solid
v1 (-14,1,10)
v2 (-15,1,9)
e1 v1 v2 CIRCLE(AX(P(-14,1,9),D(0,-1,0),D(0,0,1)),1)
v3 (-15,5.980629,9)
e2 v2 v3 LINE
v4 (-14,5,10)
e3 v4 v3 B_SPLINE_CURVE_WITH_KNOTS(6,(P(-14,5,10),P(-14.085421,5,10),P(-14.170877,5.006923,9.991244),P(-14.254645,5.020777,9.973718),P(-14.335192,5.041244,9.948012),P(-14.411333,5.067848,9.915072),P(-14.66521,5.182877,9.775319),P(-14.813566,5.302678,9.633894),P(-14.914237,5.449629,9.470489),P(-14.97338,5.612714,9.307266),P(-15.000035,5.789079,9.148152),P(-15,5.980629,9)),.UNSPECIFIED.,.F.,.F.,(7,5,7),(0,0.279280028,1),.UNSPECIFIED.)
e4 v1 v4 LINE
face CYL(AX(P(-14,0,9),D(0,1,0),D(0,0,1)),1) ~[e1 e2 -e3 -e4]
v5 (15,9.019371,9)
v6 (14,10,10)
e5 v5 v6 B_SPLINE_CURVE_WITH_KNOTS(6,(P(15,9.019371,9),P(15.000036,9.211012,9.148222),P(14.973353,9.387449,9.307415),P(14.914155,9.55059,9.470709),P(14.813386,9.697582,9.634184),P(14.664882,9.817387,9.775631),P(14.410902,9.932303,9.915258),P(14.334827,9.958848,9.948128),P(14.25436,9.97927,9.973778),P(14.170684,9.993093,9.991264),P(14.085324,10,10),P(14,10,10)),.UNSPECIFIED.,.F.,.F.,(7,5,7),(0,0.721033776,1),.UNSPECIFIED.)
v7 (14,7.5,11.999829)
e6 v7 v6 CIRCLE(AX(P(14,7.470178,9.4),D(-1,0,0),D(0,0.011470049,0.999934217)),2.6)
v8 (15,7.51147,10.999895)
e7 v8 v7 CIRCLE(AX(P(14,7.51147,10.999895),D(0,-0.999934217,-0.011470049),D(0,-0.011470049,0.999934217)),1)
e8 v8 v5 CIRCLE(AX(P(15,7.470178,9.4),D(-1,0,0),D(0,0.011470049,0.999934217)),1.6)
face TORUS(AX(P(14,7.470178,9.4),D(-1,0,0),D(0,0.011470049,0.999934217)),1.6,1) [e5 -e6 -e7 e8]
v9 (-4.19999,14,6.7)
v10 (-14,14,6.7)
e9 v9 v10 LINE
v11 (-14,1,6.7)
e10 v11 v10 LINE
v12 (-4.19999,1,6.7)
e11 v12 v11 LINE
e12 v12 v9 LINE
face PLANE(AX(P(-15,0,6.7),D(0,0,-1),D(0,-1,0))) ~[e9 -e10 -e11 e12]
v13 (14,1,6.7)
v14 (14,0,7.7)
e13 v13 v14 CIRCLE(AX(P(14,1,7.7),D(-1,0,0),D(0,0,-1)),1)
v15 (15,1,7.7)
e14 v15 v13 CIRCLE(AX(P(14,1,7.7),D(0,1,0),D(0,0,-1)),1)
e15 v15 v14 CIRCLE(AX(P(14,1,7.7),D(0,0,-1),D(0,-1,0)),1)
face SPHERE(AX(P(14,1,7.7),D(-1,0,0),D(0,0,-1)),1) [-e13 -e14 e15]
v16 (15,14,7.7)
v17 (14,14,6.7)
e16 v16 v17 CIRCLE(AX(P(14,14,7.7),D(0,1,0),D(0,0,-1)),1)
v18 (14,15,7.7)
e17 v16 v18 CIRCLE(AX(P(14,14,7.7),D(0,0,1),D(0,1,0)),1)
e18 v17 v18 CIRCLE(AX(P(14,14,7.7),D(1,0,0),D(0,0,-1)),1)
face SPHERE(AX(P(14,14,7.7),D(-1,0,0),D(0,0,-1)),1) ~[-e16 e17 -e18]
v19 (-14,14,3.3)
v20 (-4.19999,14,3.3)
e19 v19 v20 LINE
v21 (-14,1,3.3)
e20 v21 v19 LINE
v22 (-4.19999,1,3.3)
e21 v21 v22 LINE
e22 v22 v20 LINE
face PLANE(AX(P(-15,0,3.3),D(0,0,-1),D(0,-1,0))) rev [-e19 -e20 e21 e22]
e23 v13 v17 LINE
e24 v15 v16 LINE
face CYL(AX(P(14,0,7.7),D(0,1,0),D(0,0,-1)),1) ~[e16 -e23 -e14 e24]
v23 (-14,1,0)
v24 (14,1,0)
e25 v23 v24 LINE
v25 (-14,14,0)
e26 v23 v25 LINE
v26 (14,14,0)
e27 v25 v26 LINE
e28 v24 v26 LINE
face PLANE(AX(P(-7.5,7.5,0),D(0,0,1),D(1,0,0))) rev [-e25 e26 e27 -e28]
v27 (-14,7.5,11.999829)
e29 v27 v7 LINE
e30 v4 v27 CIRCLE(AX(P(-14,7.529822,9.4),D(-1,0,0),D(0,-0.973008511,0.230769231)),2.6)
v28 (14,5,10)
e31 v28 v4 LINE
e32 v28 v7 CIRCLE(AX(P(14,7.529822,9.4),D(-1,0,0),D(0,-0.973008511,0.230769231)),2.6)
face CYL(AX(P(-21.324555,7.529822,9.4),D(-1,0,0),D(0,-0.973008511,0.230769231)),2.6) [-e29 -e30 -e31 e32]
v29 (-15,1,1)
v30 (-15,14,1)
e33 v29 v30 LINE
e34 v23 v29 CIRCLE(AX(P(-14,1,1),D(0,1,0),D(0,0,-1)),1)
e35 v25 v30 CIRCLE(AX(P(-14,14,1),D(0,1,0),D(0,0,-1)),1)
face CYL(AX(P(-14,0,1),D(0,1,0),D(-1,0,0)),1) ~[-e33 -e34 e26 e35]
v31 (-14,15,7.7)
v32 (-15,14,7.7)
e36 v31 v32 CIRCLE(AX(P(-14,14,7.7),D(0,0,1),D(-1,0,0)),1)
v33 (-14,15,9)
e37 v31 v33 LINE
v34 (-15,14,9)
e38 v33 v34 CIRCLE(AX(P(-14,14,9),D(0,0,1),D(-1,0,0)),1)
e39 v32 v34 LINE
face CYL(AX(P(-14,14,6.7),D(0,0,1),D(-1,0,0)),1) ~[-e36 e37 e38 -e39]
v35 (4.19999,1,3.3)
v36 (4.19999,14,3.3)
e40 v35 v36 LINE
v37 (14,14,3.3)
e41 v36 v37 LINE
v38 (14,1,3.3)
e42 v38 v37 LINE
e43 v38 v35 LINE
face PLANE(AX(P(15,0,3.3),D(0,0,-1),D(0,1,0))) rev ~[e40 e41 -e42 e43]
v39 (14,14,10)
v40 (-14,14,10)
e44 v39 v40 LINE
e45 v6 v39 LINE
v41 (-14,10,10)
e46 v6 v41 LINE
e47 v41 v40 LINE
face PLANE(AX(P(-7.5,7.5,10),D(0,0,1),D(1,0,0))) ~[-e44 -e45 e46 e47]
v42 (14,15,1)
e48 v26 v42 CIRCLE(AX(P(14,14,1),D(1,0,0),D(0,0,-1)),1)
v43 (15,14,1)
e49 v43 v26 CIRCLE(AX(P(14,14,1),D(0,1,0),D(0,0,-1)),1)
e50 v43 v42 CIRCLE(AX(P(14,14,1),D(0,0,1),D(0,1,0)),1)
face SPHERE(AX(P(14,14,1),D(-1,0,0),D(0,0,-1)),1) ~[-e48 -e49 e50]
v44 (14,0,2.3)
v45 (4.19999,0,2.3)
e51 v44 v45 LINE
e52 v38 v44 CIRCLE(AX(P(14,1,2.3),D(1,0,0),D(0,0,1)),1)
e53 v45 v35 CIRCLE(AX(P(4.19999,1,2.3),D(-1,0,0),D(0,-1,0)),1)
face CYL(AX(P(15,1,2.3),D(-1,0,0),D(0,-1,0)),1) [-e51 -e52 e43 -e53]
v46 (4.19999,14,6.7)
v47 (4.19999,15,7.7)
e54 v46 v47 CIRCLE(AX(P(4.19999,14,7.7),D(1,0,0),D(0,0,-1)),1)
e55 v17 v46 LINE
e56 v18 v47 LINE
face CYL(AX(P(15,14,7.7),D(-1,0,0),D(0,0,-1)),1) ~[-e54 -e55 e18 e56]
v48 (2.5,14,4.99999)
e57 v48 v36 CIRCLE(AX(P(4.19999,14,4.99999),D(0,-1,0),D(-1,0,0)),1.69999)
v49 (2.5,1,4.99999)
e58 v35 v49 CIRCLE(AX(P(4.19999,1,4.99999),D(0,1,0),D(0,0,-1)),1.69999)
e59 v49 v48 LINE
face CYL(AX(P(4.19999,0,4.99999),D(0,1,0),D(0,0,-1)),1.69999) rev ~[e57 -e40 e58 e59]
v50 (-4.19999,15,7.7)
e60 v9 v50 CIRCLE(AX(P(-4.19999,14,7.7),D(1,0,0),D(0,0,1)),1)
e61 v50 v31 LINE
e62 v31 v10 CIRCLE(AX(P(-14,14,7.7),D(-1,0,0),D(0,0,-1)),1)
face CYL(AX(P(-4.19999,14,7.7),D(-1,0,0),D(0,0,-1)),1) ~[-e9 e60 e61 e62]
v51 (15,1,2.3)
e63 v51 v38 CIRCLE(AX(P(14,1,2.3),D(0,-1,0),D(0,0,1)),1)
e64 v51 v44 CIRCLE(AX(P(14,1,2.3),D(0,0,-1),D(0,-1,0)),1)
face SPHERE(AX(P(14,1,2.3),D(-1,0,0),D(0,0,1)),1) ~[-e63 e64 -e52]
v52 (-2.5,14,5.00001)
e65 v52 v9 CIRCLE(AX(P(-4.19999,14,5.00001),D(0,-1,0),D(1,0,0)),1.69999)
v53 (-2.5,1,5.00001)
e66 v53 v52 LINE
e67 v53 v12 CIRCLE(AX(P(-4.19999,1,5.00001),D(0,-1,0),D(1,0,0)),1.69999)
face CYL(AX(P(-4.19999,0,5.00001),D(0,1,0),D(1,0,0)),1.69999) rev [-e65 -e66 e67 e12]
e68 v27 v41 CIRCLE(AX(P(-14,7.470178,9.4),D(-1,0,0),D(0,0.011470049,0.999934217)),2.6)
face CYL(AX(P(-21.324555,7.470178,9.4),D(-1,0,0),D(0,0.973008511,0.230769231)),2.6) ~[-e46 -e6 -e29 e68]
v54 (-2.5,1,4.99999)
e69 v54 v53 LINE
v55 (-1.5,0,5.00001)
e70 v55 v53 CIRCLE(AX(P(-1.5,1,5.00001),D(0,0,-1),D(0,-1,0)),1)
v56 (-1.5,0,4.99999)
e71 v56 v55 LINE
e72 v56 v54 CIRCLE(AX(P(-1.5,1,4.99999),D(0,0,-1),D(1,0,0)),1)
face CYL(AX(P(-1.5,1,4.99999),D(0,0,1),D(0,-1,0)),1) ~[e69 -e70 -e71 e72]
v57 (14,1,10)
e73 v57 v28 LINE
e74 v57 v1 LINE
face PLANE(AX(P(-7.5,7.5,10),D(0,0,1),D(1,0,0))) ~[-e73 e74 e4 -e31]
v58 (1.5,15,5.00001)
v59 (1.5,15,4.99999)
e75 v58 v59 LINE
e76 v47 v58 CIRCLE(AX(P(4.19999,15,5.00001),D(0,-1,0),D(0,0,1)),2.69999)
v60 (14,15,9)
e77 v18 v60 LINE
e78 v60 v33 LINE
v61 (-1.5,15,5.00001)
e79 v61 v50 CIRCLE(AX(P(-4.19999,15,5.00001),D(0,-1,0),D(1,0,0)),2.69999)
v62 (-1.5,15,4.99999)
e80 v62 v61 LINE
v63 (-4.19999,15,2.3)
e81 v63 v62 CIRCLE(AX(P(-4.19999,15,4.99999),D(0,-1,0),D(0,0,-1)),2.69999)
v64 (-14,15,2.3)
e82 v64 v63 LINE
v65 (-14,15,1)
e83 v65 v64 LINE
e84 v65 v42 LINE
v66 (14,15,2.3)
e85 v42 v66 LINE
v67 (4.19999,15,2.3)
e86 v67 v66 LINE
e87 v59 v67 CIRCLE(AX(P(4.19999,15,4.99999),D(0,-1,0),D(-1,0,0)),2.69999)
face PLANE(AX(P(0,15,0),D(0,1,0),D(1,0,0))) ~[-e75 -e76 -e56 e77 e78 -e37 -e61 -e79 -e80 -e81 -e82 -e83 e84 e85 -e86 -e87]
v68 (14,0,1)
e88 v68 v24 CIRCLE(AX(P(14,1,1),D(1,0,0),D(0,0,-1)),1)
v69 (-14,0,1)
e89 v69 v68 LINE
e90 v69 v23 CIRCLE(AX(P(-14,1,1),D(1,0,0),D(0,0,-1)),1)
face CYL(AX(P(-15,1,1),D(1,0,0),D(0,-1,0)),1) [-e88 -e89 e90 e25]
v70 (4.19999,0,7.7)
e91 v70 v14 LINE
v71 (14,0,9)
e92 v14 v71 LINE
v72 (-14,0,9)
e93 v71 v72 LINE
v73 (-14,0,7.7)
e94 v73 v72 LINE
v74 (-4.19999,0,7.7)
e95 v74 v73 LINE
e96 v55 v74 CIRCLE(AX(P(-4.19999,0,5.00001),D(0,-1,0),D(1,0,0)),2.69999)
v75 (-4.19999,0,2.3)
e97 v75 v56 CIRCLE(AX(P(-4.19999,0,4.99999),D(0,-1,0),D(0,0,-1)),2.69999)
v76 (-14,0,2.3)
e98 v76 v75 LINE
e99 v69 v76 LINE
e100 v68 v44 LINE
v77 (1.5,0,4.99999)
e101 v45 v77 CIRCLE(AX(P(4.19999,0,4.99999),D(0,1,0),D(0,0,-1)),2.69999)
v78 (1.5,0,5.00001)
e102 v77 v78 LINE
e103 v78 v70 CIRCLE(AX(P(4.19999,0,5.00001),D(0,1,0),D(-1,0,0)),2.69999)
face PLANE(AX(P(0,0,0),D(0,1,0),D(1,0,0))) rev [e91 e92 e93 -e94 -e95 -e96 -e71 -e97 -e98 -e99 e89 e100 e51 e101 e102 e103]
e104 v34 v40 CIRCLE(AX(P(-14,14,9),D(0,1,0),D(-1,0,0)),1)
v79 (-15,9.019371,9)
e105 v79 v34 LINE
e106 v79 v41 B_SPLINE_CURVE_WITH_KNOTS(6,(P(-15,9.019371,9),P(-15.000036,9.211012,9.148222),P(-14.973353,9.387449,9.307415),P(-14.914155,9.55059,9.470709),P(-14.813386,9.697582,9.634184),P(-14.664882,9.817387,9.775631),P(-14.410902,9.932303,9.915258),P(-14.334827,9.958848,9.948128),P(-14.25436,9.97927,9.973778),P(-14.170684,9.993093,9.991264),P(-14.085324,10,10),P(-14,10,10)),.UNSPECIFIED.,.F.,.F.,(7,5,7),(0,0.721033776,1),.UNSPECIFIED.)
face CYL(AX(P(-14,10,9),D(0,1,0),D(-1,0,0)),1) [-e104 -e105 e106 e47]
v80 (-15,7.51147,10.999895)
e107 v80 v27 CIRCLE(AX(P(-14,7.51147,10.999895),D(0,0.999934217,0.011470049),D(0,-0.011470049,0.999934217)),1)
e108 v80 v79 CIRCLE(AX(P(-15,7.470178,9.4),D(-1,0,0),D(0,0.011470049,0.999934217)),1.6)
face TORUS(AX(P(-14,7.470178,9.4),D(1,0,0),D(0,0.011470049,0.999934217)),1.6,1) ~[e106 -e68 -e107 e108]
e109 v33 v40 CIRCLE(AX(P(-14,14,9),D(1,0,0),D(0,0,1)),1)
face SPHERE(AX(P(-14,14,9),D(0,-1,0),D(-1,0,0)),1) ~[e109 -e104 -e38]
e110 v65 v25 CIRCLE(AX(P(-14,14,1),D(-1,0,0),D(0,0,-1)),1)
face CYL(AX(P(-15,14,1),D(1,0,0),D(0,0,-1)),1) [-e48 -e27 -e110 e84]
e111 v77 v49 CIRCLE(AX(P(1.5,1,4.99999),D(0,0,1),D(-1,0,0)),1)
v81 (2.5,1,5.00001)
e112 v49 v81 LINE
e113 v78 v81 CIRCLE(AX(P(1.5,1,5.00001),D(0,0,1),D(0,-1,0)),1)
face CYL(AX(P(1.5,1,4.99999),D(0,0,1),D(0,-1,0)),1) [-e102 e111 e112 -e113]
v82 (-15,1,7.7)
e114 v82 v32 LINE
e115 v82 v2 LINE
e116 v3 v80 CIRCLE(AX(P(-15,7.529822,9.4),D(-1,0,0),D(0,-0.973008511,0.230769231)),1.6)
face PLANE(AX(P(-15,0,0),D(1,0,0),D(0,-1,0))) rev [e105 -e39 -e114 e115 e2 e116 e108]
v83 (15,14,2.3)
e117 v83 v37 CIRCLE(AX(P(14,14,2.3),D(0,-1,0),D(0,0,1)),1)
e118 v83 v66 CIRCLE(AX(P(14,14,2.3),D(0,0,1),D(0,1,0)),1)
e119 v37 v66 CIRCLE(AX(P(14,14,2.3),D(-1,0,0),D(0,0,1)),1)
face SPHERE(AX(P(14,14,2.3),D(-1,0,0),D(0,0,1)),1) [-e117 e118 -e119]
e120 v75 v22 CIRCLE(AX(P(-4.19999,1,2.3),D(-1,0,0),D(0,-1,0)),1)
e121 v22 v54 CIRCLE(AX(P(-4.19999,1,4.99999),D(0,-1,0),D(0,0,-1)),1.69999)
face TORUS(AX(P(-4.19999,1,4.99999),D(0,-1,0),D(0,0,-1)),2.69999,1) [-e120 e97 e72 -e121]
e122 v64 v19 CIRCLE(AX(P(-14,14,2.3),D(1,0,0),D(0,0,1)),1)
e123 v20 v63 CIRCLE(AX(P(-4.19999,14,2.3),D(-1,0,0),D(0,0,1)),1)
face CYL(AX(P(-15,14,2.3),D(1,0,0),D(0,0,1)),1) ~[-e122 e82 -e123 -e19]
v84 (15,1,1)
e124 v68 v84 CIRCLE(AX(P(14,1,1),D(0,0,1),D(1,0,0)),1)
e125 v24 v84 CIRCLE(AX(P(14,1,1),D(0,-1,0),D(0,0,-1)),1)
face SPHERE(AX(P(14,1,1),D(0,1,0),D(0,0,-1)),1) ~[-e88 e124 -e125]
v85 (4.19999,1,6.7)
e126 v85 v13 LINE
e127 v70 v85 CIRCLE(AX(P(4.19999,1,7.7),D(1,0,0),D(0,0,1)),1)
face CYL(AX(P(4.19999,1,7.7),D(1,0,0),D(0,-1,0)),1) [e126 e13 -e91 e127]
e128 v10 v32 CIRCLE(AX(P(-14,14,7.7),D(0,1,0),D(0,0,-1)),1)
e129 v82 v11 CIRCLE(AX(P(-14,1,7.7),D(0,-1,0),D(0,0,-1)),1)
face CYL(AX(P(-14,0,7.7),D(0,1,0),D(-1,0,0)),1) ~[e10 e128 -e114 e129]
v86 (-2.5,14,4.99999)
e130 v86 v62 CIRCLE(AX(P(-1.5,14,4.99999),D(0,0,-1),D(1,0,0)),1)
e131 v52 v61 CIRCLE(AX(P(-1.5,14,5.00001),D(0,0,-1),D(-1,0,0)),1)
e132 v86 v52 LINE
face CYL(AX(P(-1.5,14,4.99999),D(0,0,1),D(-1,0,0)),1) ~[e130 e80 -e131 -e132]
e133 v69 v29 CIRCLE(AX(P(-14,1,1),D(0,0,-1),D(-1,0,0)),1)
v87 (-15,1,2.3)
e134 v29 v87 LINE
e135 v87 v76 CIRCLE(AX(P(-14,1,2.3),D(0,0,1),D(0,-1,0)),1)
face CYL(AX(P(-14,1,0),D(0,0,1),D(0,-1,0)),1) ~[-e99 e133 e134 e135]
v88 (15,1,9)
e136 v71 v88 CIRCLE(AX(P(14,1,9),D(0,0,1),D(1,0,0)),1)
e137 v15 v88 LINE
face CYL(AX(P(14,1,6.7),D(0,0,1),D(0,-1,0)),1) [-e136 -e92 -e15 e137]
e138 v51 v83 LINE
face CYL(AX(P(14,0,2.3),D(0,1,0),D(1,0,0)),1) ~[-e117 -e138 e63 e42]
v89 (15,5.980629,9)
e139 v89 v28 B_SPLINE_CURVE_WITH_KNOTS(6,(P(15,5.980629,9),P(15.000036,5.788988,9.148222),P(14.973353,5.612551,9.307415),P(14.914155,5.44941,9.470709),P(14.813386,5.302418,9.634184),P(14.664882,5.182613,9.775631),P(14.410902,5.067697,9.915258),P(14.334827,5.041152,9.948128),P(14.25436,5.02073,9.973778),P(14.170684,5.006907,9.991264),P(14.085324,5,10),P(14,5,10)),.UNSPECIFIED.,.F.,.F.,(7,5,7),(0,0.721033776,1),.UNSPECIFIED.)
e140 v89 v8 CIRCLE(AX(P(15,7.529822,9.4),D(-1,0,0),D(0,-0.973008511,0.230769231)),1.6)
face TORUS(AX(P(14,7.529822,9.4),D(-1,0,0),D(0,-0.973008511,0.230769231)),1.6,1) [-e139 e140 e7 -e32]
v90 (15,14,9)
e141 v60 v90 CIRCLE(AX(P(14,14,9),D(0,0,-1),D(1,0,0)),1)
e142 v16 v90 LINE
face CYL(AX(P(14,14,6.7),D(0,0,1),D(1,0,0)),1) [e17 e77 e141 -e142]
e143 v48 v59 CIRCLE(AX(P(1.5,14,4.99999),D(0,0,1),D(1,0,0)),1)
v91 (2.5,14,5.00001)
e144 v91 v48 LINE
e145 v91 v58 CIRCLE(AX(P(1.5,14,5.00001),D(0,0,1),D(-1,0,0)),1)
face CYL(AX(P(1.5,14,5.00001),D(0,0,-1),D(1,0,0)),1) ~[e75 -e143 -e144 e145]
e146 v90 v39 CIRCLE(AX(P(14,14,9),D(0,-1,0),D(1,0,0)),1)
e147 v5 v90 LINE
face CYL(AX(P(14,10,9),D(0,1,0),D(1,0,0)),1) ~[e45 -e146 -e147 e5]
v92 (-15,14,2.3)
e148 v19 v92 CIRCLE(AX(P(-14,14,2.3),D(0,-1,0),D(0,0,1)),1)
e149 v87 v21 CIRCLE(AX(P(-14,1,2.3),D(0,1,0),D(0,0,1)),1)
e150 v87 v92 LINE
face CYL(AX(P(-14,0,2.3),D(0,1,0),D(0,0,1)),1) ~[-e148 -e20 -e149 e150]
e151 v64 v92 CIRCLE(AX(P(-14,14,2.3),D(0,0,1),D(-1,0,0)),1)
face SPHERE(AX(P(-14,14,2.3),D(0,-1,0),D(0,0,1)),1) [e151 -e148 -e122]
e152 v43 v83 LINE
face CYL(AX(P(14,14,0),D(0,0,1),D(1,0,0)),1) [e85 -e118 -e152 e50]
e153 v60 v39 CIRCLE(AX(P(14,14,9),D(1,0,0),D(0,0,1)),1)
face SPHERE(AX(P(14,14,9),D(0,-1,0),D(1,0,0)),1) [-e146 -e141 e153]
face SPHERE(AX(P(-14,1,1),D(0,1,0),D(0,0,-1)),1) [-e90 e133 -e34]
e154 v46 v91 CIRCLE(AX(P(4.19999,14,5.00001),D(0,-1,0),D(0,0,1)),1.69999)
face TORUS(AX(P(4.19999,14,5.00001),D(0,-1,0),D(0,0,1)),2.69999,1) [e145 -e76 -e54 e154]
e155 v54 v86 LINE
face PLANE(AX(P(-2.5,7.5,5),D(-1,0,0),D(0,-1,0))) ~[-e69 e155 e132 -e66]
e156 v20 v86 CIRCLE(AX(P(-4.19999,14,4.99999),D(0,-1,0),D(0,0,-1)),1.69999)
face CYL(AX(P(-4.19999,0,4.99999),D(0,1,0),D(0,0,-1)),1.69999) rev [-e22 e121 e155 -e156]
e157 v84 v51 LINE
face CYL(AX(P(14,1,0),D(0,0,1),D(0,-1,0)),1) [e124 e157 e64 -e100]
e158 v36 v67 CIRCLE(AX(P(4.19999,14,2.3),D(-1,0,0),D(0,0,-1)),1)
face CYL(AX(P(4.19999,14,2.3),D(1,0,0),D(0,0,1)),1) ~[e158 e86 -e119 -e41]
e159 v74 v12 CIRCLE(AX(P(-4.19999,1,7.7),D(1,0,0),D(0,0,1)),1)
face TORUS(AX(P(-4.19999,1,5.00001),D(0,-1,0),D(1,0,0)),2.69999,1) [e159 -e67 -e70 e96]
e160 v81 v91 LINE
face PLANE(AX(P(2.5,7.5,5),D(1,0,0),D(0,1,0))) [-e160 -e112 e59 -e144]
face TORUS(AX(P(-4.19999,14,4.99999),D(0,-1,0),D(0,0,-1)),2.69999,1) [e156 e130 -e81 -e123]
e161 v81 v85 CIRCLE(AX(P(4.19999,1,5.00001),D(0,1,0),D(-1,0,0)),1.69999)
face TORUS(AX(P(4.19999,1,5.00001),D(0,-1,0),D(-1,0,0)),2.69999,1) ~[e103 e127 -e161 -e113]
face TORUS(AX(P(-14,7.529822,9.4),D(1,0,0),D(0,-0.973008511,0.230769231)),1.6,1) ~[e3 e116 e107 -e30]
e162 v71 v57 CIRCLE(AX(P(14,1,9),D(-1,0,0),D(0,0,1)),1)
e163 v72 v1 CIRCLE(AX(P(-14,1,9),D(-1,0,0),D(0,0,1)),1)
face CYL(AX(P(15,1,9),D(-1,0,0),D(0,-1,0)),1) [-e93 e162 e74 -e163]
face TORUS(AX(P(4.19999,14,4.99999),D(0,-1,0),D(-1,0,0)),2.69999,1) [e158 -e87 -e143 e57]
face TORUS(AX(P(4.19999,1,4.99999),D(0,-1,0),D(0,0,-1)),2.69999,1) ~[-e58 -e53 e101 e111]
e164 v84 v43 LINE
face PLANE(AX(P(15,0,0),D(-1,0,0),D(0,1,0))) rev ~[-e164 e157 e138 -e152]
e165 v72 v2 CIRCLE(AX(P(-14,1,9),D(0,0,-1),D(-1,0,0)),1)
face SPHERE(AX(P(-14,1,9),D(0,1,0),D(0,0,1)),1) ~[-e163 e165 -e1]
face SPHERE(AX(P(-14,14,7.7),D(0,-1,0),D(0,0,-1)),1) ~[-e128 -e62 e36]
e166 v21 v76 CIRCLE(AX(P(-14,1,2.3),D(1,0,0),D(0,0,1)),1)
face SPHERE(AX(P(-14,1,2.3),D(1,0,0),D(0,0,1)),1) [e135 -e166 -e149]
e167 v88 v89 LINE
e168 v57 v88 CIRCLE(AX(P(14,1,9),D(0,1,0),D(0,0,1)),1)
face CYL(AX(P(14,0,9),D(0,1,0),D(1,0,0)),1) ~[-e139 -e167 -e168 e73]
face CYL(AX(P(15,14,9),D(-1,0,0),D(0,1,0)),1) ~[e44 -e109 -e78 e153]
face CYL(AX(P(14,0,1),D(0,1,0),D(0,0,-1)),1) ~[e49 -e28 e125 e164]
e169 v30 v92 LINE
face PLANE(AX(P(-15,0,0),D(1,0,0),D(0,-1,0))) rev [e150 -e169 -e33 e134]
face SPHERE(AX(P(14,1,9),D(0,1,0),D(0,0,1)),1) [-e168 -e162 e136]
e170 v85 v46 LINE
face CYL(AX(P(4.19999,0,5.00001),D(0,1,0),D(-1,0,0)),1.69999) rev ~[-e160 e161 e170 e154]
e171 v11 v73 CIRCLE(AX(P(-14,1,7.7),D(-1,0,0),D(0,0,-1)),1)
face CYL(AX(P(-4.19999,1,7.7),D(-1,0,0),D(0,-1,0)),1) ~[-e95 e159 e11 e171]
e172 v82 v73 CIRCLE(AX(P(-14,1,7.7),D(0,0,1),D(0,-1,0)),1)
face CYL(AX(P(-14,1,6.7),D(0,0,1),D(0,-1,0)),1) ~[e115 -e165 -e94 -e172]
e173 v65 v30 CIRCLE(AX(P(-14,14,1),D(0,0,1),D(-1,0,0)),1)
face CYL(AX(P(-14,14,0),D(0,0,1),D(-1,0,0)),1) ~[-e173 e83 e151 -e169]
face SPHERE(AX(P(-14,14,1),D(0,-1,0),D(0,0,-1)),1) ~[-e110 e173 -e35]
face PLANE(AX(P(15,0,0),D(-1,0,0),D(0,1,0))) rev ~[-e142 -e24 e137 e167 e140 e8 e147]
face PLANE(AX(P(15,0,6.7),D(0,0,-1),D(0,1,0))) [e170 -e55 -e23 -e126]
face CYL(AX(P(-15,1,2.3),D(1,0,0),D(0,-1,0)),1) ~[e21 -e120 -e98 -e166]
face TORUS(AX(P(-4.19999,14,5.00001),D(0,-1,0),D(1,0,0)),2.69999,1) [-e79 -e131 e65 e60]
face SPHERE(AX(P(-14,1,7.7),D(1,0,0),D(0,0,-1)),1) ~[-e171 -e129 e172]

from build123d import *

# Parameters (mm, degrees)
F0_W        = 15
F0_H        = 15
F1_DEPTH    = 10
F2_W        = 15
F2_H        = 3.4
F3_DEPTH    = 12.5
F4_R        = 1.69999
F6_W        = 5
F6_H        = 2
F7_DEPTH    = 30
F8_T1_DEPTH = 42.6491106407
F9_R        = 1


# Not quite as in the source:
# - a fillet or chamfer that OpenCascade refuses, or shapes differently, is made with other operations: its cross-section is extruded or revolved along the edge and cut away or added
# - a fillet or chamfer is up to 0.001 mm smaller than in the source, because OpenCascade refuses the exact size


with BuildPart() as f1:
    # F0 (on Top) → F1 (new body)
    with BuildSketch(Plane.XY):
        with Locations((7.5, 7.5)):
            Rectangle(F0_W, F0_H)
    extrude(amount=F1_DEPTH)

    # F2 (on face) → F3 (cut)
    with BuildSketch(Plane.YZ.offset(15)):
        with Locations((7.5, 5)):
            Rectangle(F2_W, F2_H)
    extrude(amount=-F3_DEPTH, mode=Mode.SUBTRACT)

    # F4 (radius 1.7 in the source; OpenCascade refuses exactly that, so slightly less here)
    f4_edges = [f1.edges().sort_by_distance(p)[0] for p in [
        (2.5, 7.5, 3.3),
        (2.5, 7.5, 6.7),
    ]]
    fillet(f4_edges, radius=F4_R)

    # F5: F1 across face


with BuildPart() as f1_1:
    add(f1.part)
    add(f1.part.mirror(Plane(origin=(0, 7.5, 5), x_dir=(0, -1, 0), z_dir=(-1, 0, 0))))

    # F6 (on face) → F7 (join, through all)
    with BuildSketch(Plane.YZ.offset(15)):
        with Locations((7.5, 11)):
            Rectangle(F6_W, F6_H)
    extrude(amount=-F7_DEPTH)

    # F8: fillet of radius 2.6 on 2 edges, made by hand

    # F8_s2 → F8_t1 (cut)
    with BuildSketch(Plane.YZ.offset(-21.3245553203)):
        with BuildLine():
            ThreePointArc((5, 10), (5.9173705785, 11.4396078054), (7.5298221281, 12))
            Line((7.5298221281, 12), (5, 12))
            Line((5, 12), (5, 10))
        make_face()
        with BuildLine():
            ThreePointArc((10, 10), (9.0826294215, 11.4396078054), (7.4701778719, 12))
            Line((7.4701778719, 12), (10, 12))
            Line((10, 12), (10, 10))
        make_face()
    extrude(amount=F8_T1_DEPTH, mode=Mode.SUBTRACT)

    # F9
    f9_edges = [f1_1.edges().sort_by_distance(p)[0] for p in [
        (-9.599995, 0, 3.3),
        (9.599995, 0, 3.3),
        (-15, 7.5, 3.3),
        (-15, 7.5, 0),
        (-15, 7.5, 6.7),
        (0, 15, 0),
        (-9.599995, 15, 3.3),
        (9.599995, 15, 6.7),
        (15, 7.5, 0),
        (15, 7.5, 6.7),
        (15, 7.5, 3.3),
        (0, 0, 0),
        (-15, 15, 1.65),
        (15, 15, 1.65),
        (15, 0, 1.65),
        (-15, 0, 1.65),
        (15, 5.9057, 11.430327),
        (15, 2.5, 10),
        (15, 12.5, 10),
        (-15, 2.5, 10),
        (-15, 12.5, 10),
        (0, 0, 10),
        (-15, 0, 8.35),
        (15, 0, 8.35),
        (-15, 15, 8.35),
        (15, 15, 8.35),
        (15, 9.0943, 11.430327),
        (-15, 9.0943, 11.430327),
        (-15, 5.9057, 11.430327),
        (0, 15, 10),
        (-9.599995, 15, 6.7),
        (-2.997916, 15, 6.202084),
        (-2.5, 15, 5),
        (-2.997916, 15, 3.797916),
        (9.599995, 15, 3.3),
        (2.997916, 15, 3.797916),
        (2.5, 15, 5),
        (2.997916, 15, 6.202084),
        (9.599995, 0, 6.7),
        (-9.599995, 0, 6.7),
        (-2.997916, 0, 6.202084),
        (-2.5, 0, 5),
        (-2.997916, 0, 3.797916),
        (2.997916, 0, 3.797916),
        (2.5, 0, 5),
        (2.997916, 0, 6.202084),
    ]]
    fillet(f9_edges, radius=F9_R)


solid = f1_1.part
